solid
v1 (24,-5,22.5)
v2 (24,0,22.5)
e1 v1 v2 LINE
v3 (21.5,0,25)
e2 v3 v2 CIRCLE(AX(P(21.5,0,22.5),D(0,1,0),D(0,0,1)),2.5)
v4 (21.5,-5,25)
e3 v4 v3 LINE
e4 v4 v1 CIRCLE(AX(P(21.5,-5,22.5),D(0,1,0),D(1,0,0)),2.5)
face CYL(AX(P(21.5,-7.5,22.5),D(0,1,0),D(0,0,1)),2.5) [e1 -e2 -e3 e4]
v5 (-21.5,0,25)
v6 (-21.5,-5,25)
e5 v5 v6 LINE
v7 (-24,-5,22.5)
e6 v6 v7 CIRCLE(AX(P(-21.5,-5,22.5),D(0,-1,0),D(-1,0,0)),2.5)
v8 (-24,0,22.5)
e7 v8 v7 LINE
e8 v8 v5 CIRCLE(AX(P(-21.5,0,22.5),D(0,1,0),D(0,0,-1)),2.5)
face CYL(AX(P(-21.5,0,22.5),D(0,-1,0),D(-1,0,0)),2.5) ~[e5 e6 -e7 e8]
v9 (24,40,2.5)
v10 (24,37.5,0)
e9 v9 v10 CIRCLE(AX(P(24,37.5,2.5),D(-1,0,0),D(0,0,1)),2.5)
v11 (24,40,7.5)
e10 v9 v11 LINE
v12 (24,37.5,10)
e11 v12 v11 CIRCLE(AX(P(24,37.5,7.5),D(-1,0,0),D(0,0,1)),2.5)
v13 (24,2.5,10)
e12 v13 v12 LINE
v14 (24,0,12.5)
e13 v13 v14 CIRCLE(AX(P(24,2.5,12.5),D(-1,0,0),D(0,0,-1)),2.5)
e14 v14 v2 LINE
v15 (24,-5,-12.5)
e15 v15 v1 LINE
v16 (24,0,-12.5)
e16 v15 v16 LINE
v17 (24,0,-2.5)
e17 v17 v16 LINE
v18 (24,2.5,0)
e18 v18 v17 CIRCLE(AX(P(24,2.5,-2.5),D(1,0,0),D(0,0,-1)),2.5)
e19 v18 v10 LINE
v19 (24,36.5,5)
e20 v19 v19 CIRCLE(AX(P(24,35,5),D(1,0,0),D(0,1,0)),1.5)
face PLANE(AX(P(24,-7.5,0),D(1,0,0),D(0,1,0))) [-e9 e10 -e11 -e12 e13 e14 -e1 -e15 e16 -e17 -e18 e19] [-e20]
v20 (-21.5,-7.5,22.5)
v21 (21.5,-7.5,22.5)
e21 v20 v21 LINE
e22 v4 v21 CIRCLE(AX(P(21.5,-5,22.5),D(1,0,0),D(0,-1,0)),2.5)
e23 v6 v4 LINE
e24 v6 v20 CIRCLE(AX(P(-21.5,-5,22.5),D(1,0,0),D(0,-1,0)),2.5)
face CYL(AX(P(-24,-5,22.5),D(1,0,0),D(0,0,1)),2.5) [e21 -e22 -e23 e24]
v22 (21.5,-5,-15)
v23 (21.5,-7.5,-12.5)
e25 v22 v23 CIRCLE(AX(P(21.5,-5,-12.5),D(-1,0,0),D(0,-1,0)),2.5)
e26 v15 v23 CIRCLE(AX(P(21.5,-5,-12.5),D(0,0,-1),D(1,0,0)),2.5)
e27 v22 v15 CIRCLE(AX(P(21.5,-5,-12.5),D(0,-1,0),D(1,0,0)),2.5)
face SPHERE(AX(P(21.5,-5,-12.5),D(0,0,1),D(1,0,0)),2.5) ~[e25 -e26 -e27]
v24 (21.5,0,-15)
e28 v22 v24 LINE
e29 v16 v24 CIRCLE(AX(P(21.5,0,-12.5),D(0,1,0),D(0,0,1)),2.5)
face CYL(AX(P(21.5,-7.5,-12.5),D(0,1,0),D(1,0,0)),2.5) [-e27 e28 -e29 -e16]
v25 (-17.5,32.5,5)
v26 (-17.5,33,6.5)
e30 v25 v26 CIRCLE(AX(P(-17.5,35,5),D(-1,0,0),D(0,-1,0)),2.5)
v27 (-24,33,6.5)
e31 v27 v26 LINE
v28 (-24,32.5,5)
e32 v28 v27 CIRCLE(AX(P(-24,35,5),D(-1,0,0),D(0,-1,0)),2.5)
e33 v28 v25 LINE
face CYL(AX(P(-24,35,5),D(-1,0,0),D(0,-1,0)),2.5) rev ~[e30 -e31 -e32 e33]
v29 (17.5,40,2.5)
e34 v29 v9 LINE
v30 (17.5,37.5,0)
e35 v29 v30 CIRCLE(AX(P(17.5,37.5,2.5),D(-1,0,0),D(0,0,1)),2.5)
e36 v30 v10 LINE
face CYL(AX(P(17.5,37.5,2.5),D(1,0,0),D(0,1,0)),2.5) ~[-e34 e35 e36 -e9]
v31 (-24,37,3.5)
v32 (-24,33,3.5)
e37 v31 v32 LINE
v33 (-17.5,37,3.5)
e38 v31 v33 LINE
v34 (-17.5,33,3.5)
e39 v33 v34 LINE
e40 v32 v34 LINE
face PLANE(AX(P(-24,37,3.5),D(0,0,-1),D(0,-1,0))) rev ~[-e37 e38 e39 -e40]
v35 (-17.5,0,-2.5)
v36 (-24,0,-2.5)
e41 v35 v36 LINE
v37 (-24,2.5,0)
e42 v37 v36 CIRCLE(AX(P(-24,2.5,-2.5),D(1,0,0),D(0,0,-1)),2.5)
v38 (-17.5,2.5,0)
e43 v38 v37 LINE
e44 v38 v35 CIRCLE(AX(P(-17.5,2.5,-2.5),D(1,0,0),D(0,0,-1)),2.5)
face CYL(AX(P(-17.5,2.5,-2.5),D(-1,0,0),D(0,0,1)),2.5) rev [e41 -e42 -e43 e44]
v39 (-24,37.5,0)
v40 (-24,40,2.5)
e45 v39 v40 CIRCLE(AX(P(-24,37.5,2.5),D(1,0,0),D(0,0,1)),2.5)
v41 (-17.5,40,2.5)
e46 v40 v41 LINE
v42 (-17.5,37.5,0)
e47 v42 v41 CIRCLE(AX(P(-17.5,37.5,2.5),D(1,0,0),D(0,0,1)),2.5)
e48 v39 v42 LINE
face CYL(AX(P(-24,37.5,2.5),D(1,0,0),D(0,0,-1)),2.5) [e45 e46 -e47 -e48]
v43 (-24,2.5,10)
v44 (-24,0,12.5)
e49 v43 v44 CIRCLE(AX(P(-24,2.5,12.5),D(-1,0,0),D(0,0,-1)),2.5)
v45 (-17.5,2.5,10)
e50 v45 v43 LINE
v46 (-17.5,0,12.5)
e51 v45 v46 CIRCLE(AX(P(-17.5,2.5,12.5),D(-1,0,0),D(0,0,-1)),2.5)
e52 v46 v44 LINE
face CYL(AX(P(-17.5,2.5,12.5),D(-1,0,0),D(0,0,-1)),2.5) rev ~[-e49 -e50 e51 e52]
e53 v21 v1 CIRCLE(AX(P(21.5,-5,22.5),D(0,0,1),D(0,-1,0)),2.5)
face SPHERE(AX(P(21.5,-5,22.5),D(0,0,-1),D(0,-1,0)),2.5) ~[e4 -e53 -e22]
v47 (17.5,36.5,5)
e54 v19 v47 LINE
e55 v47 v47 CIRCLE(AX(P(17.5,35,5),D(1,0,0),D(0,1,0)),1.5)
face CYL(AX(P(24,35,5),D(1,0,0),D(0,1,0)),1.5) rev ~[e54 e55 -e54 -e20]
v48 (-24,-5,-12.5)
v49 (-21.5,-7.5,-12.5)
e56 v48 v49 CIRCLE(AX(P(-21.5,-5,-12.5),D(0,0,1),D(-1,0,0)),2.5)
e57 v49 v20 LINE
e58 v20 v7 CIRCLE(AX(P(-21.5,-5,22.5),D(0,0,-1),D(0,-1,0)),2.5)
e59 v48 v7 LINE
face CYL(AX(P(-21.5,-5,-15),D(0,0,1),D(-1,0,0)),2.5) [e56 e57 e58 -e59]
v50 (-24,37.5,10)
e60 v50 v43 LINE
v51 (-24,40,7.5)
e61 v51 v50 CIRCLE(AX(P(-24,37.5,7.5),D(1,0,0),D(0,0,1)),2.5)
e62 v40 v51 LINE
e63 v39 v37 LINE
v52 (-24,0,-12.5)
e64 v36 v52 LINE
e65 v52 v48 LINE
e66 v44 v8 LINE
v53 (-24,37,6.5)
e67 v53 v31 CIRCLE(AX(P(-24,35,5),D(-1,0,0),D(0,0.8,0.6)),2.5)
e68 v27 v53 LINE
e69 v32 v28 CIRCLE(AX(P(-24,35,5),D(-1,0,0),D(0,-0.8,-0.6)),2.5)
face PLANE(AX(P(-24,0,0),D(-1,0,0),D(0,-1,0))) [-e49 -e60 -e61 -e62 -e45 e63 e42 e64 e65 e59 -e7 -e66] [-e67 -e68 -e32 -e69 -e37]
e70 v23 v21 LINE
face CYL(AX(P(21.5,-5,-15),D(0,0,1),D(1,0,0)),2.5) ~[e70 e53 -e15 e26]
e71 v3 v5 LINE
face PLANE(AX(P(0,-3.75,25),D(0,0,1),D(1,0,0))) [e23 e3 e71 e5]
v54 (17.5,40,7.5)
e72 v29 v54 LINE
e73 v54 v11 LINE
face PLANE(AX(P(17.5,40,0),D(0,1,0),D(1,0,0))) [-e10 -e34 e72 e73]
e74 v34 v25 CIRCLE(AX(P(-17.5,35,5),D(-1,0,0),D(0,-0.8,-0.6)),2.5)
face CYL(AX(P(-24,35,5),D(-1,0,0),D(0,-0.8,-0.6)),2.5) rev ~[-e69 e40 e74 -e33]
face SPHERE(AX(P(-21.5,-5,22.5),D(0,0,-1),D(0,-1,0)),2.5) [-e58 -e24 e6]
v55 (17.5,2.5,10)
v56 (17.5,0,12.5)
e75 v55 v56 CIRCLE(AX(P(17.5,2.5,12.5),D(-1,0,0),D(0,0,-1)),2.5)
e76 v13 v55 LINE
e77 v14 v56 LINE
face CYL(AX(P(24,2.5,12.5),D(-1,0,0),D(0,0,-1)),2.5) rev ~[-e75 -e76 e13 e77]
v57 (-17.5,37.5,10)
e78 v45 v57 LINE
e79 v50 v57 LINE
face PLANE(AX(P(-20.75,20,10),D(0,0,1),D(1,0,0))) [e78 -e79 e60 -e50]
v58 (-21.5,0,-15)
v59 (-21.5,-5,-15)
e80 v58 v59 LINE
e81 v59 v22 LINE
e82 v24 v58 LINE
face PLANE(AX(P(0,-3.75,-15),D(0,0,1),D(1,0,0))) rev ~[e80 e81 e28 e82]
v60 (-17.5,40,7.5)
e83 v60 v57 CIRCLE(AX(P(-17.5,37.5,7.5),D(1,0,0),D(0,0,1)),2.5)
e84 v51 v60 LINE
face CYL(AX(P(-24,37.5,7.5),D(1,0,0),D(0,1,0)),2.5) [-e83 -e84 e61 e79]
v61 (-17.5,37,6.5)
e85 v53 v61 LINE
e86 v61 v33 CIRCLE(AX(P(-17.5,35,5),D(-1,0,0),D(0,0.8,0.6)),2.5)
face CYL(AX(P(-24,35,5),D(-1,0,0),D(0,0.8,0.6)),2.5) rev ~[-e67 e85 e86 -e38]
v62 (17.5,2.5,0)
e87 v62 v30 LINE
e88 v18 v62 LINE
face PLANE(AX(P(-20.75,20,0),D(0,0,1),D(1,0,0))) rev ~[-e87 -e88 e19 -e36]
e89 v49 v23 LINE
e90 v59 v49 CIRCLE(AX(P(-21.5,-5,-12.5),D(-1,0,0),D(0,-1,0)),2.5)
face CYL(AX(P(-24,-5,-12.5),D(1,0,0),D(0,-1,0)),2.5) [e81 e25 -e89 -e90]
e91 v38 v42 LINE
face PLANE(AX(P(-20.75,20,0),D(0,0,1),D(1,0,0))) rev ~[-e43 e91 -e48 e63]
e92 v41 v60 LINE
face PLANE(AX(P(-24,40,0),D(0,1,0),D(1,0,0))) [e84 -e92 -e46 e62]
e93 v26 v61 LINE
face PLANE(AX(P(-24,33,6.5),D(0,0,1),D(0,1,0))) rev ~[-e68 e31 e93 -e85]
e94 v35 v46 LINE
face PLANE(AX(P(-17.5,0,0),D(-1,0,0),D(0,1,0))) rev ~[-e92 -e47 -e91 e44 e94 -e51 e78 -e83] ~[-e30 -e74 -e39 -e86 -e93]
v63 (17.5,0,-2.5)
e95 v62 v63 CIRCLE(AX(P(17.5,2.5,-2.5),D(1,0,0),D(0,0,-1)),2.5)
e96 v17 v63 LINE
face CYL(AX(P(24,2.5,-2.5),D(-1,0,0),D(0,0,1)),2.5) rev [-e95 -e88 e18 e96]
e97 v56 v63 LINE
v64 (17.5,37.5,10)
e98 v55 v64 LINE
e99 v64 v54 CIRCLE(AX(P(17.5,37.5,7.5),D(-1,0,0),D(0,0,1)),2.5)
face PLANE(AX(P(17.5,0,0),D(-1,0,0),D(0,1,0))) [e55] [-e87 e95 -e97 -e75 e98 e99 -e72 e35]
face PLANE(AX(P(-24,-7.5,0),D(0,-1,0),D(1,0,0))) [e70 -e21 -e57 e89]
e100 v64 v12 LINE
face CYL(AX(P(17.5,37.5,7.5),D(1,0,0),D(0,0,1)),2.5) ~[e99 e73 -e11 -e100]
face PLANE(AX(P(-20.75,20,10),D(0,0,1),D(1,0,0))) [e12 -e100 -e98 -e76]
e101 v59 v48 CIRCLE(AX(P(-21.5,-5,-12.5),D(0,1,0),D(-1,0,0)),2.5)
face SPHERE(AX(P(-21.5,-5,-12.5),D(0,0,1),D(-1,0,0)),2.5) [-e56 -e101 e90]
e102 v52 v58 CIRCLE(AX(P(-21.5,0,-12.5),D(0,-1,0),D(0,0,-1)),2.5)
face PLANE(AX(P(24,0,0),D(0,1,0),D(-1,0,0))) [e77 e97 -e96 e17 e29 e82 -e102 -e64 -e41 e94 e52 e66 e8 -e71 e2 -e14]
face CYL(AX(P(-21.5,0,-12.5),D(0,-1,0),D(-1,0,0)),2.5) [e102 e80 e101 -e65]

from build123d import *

# Parameters (mm, degrees)
F0_W     = 6.5
F0_H     = 40
F1_DEPTH = 10
F4_DEPTH = 6.5
F2_R     = 1.5
F5_DEPTH = 6.5
F7_DEPTH = 15
F8_DEPTH = 15
F9_R     = 2.5


# Not quite as in the source:
# - a feature names something its author has since deleted; it is built from what else it names


with BuildPart() as f1:
    # F0 (on Top) → F1 (new body)
    with BuildSketch(Plane.XY):
        with Locations((-20.75, 20)):
            Rectangle(F0_W, F0_H)
        with Locations((20.75, 20)):
            Rectangle(F0_W, F0_H)
        Polygon((-17.5, 0), (-24, 0), (-24, -7.5), (24, -7.5), (24, 0), (17.5, 0), align=None)
    extrude(amount=F1_DEPTH)

    # F3 (on face) → F4 (cut, through all)
    with BuildSketch(Plane(origin=(-24, 0, 0), x_dir=(0, -1, 0), z_dir=(-1, 0, 0))):
        with BuildLine():
            ThreePointArc((-33, 3.5), (-32.6282917549, 4.209430585), (-32.5, 5))
            ThreePointArc((-32.5, 5), (-32.6282917549, 5.790569415), (-33, 6.5))
            Line((-33, 6.5), (-37, 6.5))
            ThreePointArc((-37, 6.5), (-37.5, 5), (-37, 3.5))
            Line((-37, 3.5), (-33, 3.5))
        make_face()
    extrude(amount=-F4_DEPTH, mode=Mode.SUBTRACT)

    # F2 (on face) → F5 (cut, through all)
    with BuildSketch(Plane.YZ.offset(24)):
        with Locations((35, 5)):
            Circle(F2_R)
    extrude(amount=-F5_DEPTH, mode=Mode.SUBTRACT)

    # F6 (on face) → F7 (join)
    with BuildSketch(Plane.XY.offset(10)):
        Polygon((-17.5, 0), (-24, 0), (-24, -7.5), (24, -7.5), (24, 0), (17.5, 0), align=None)
    extrude(amount=F7_DEPTH)

    # F0 (on Top) → F8 (join)
    with BuildSketch(Plane.XY):
        Polygon((-17.5, 0), (-24, 0), (-24, -7.5), (24, -7.5), (24, 0), (17.5, 0), align=None)
    extrude(amount=-F8_DEPTH)

    # F9
    f9_edges = [f1.edges().sort_by_distance(p)[0] for p in [
        (-24, -7.5, 5),
        (24, -7.5, 5),
        (-20.75, 40, 10),
        (-20.75, 40, 0),
        (20.75, 40, 10),
        (20.75, 40, 0),
        (0, -7.5, 25),
        (24, -3.75, 25),
        (-24, -3.75, 25),
        (-24, -3.75, -15),
        (24, -3.75, -15),
        (0, -7.5, -15),
        (20.75, 0, 10),
        (20.75, 0, 0),
        (-20.75, 0, 10),
        (-20.75, 0, 0),
    ]]
    fillet(f9_edges, radius=F9_R)


solid = f1.part
